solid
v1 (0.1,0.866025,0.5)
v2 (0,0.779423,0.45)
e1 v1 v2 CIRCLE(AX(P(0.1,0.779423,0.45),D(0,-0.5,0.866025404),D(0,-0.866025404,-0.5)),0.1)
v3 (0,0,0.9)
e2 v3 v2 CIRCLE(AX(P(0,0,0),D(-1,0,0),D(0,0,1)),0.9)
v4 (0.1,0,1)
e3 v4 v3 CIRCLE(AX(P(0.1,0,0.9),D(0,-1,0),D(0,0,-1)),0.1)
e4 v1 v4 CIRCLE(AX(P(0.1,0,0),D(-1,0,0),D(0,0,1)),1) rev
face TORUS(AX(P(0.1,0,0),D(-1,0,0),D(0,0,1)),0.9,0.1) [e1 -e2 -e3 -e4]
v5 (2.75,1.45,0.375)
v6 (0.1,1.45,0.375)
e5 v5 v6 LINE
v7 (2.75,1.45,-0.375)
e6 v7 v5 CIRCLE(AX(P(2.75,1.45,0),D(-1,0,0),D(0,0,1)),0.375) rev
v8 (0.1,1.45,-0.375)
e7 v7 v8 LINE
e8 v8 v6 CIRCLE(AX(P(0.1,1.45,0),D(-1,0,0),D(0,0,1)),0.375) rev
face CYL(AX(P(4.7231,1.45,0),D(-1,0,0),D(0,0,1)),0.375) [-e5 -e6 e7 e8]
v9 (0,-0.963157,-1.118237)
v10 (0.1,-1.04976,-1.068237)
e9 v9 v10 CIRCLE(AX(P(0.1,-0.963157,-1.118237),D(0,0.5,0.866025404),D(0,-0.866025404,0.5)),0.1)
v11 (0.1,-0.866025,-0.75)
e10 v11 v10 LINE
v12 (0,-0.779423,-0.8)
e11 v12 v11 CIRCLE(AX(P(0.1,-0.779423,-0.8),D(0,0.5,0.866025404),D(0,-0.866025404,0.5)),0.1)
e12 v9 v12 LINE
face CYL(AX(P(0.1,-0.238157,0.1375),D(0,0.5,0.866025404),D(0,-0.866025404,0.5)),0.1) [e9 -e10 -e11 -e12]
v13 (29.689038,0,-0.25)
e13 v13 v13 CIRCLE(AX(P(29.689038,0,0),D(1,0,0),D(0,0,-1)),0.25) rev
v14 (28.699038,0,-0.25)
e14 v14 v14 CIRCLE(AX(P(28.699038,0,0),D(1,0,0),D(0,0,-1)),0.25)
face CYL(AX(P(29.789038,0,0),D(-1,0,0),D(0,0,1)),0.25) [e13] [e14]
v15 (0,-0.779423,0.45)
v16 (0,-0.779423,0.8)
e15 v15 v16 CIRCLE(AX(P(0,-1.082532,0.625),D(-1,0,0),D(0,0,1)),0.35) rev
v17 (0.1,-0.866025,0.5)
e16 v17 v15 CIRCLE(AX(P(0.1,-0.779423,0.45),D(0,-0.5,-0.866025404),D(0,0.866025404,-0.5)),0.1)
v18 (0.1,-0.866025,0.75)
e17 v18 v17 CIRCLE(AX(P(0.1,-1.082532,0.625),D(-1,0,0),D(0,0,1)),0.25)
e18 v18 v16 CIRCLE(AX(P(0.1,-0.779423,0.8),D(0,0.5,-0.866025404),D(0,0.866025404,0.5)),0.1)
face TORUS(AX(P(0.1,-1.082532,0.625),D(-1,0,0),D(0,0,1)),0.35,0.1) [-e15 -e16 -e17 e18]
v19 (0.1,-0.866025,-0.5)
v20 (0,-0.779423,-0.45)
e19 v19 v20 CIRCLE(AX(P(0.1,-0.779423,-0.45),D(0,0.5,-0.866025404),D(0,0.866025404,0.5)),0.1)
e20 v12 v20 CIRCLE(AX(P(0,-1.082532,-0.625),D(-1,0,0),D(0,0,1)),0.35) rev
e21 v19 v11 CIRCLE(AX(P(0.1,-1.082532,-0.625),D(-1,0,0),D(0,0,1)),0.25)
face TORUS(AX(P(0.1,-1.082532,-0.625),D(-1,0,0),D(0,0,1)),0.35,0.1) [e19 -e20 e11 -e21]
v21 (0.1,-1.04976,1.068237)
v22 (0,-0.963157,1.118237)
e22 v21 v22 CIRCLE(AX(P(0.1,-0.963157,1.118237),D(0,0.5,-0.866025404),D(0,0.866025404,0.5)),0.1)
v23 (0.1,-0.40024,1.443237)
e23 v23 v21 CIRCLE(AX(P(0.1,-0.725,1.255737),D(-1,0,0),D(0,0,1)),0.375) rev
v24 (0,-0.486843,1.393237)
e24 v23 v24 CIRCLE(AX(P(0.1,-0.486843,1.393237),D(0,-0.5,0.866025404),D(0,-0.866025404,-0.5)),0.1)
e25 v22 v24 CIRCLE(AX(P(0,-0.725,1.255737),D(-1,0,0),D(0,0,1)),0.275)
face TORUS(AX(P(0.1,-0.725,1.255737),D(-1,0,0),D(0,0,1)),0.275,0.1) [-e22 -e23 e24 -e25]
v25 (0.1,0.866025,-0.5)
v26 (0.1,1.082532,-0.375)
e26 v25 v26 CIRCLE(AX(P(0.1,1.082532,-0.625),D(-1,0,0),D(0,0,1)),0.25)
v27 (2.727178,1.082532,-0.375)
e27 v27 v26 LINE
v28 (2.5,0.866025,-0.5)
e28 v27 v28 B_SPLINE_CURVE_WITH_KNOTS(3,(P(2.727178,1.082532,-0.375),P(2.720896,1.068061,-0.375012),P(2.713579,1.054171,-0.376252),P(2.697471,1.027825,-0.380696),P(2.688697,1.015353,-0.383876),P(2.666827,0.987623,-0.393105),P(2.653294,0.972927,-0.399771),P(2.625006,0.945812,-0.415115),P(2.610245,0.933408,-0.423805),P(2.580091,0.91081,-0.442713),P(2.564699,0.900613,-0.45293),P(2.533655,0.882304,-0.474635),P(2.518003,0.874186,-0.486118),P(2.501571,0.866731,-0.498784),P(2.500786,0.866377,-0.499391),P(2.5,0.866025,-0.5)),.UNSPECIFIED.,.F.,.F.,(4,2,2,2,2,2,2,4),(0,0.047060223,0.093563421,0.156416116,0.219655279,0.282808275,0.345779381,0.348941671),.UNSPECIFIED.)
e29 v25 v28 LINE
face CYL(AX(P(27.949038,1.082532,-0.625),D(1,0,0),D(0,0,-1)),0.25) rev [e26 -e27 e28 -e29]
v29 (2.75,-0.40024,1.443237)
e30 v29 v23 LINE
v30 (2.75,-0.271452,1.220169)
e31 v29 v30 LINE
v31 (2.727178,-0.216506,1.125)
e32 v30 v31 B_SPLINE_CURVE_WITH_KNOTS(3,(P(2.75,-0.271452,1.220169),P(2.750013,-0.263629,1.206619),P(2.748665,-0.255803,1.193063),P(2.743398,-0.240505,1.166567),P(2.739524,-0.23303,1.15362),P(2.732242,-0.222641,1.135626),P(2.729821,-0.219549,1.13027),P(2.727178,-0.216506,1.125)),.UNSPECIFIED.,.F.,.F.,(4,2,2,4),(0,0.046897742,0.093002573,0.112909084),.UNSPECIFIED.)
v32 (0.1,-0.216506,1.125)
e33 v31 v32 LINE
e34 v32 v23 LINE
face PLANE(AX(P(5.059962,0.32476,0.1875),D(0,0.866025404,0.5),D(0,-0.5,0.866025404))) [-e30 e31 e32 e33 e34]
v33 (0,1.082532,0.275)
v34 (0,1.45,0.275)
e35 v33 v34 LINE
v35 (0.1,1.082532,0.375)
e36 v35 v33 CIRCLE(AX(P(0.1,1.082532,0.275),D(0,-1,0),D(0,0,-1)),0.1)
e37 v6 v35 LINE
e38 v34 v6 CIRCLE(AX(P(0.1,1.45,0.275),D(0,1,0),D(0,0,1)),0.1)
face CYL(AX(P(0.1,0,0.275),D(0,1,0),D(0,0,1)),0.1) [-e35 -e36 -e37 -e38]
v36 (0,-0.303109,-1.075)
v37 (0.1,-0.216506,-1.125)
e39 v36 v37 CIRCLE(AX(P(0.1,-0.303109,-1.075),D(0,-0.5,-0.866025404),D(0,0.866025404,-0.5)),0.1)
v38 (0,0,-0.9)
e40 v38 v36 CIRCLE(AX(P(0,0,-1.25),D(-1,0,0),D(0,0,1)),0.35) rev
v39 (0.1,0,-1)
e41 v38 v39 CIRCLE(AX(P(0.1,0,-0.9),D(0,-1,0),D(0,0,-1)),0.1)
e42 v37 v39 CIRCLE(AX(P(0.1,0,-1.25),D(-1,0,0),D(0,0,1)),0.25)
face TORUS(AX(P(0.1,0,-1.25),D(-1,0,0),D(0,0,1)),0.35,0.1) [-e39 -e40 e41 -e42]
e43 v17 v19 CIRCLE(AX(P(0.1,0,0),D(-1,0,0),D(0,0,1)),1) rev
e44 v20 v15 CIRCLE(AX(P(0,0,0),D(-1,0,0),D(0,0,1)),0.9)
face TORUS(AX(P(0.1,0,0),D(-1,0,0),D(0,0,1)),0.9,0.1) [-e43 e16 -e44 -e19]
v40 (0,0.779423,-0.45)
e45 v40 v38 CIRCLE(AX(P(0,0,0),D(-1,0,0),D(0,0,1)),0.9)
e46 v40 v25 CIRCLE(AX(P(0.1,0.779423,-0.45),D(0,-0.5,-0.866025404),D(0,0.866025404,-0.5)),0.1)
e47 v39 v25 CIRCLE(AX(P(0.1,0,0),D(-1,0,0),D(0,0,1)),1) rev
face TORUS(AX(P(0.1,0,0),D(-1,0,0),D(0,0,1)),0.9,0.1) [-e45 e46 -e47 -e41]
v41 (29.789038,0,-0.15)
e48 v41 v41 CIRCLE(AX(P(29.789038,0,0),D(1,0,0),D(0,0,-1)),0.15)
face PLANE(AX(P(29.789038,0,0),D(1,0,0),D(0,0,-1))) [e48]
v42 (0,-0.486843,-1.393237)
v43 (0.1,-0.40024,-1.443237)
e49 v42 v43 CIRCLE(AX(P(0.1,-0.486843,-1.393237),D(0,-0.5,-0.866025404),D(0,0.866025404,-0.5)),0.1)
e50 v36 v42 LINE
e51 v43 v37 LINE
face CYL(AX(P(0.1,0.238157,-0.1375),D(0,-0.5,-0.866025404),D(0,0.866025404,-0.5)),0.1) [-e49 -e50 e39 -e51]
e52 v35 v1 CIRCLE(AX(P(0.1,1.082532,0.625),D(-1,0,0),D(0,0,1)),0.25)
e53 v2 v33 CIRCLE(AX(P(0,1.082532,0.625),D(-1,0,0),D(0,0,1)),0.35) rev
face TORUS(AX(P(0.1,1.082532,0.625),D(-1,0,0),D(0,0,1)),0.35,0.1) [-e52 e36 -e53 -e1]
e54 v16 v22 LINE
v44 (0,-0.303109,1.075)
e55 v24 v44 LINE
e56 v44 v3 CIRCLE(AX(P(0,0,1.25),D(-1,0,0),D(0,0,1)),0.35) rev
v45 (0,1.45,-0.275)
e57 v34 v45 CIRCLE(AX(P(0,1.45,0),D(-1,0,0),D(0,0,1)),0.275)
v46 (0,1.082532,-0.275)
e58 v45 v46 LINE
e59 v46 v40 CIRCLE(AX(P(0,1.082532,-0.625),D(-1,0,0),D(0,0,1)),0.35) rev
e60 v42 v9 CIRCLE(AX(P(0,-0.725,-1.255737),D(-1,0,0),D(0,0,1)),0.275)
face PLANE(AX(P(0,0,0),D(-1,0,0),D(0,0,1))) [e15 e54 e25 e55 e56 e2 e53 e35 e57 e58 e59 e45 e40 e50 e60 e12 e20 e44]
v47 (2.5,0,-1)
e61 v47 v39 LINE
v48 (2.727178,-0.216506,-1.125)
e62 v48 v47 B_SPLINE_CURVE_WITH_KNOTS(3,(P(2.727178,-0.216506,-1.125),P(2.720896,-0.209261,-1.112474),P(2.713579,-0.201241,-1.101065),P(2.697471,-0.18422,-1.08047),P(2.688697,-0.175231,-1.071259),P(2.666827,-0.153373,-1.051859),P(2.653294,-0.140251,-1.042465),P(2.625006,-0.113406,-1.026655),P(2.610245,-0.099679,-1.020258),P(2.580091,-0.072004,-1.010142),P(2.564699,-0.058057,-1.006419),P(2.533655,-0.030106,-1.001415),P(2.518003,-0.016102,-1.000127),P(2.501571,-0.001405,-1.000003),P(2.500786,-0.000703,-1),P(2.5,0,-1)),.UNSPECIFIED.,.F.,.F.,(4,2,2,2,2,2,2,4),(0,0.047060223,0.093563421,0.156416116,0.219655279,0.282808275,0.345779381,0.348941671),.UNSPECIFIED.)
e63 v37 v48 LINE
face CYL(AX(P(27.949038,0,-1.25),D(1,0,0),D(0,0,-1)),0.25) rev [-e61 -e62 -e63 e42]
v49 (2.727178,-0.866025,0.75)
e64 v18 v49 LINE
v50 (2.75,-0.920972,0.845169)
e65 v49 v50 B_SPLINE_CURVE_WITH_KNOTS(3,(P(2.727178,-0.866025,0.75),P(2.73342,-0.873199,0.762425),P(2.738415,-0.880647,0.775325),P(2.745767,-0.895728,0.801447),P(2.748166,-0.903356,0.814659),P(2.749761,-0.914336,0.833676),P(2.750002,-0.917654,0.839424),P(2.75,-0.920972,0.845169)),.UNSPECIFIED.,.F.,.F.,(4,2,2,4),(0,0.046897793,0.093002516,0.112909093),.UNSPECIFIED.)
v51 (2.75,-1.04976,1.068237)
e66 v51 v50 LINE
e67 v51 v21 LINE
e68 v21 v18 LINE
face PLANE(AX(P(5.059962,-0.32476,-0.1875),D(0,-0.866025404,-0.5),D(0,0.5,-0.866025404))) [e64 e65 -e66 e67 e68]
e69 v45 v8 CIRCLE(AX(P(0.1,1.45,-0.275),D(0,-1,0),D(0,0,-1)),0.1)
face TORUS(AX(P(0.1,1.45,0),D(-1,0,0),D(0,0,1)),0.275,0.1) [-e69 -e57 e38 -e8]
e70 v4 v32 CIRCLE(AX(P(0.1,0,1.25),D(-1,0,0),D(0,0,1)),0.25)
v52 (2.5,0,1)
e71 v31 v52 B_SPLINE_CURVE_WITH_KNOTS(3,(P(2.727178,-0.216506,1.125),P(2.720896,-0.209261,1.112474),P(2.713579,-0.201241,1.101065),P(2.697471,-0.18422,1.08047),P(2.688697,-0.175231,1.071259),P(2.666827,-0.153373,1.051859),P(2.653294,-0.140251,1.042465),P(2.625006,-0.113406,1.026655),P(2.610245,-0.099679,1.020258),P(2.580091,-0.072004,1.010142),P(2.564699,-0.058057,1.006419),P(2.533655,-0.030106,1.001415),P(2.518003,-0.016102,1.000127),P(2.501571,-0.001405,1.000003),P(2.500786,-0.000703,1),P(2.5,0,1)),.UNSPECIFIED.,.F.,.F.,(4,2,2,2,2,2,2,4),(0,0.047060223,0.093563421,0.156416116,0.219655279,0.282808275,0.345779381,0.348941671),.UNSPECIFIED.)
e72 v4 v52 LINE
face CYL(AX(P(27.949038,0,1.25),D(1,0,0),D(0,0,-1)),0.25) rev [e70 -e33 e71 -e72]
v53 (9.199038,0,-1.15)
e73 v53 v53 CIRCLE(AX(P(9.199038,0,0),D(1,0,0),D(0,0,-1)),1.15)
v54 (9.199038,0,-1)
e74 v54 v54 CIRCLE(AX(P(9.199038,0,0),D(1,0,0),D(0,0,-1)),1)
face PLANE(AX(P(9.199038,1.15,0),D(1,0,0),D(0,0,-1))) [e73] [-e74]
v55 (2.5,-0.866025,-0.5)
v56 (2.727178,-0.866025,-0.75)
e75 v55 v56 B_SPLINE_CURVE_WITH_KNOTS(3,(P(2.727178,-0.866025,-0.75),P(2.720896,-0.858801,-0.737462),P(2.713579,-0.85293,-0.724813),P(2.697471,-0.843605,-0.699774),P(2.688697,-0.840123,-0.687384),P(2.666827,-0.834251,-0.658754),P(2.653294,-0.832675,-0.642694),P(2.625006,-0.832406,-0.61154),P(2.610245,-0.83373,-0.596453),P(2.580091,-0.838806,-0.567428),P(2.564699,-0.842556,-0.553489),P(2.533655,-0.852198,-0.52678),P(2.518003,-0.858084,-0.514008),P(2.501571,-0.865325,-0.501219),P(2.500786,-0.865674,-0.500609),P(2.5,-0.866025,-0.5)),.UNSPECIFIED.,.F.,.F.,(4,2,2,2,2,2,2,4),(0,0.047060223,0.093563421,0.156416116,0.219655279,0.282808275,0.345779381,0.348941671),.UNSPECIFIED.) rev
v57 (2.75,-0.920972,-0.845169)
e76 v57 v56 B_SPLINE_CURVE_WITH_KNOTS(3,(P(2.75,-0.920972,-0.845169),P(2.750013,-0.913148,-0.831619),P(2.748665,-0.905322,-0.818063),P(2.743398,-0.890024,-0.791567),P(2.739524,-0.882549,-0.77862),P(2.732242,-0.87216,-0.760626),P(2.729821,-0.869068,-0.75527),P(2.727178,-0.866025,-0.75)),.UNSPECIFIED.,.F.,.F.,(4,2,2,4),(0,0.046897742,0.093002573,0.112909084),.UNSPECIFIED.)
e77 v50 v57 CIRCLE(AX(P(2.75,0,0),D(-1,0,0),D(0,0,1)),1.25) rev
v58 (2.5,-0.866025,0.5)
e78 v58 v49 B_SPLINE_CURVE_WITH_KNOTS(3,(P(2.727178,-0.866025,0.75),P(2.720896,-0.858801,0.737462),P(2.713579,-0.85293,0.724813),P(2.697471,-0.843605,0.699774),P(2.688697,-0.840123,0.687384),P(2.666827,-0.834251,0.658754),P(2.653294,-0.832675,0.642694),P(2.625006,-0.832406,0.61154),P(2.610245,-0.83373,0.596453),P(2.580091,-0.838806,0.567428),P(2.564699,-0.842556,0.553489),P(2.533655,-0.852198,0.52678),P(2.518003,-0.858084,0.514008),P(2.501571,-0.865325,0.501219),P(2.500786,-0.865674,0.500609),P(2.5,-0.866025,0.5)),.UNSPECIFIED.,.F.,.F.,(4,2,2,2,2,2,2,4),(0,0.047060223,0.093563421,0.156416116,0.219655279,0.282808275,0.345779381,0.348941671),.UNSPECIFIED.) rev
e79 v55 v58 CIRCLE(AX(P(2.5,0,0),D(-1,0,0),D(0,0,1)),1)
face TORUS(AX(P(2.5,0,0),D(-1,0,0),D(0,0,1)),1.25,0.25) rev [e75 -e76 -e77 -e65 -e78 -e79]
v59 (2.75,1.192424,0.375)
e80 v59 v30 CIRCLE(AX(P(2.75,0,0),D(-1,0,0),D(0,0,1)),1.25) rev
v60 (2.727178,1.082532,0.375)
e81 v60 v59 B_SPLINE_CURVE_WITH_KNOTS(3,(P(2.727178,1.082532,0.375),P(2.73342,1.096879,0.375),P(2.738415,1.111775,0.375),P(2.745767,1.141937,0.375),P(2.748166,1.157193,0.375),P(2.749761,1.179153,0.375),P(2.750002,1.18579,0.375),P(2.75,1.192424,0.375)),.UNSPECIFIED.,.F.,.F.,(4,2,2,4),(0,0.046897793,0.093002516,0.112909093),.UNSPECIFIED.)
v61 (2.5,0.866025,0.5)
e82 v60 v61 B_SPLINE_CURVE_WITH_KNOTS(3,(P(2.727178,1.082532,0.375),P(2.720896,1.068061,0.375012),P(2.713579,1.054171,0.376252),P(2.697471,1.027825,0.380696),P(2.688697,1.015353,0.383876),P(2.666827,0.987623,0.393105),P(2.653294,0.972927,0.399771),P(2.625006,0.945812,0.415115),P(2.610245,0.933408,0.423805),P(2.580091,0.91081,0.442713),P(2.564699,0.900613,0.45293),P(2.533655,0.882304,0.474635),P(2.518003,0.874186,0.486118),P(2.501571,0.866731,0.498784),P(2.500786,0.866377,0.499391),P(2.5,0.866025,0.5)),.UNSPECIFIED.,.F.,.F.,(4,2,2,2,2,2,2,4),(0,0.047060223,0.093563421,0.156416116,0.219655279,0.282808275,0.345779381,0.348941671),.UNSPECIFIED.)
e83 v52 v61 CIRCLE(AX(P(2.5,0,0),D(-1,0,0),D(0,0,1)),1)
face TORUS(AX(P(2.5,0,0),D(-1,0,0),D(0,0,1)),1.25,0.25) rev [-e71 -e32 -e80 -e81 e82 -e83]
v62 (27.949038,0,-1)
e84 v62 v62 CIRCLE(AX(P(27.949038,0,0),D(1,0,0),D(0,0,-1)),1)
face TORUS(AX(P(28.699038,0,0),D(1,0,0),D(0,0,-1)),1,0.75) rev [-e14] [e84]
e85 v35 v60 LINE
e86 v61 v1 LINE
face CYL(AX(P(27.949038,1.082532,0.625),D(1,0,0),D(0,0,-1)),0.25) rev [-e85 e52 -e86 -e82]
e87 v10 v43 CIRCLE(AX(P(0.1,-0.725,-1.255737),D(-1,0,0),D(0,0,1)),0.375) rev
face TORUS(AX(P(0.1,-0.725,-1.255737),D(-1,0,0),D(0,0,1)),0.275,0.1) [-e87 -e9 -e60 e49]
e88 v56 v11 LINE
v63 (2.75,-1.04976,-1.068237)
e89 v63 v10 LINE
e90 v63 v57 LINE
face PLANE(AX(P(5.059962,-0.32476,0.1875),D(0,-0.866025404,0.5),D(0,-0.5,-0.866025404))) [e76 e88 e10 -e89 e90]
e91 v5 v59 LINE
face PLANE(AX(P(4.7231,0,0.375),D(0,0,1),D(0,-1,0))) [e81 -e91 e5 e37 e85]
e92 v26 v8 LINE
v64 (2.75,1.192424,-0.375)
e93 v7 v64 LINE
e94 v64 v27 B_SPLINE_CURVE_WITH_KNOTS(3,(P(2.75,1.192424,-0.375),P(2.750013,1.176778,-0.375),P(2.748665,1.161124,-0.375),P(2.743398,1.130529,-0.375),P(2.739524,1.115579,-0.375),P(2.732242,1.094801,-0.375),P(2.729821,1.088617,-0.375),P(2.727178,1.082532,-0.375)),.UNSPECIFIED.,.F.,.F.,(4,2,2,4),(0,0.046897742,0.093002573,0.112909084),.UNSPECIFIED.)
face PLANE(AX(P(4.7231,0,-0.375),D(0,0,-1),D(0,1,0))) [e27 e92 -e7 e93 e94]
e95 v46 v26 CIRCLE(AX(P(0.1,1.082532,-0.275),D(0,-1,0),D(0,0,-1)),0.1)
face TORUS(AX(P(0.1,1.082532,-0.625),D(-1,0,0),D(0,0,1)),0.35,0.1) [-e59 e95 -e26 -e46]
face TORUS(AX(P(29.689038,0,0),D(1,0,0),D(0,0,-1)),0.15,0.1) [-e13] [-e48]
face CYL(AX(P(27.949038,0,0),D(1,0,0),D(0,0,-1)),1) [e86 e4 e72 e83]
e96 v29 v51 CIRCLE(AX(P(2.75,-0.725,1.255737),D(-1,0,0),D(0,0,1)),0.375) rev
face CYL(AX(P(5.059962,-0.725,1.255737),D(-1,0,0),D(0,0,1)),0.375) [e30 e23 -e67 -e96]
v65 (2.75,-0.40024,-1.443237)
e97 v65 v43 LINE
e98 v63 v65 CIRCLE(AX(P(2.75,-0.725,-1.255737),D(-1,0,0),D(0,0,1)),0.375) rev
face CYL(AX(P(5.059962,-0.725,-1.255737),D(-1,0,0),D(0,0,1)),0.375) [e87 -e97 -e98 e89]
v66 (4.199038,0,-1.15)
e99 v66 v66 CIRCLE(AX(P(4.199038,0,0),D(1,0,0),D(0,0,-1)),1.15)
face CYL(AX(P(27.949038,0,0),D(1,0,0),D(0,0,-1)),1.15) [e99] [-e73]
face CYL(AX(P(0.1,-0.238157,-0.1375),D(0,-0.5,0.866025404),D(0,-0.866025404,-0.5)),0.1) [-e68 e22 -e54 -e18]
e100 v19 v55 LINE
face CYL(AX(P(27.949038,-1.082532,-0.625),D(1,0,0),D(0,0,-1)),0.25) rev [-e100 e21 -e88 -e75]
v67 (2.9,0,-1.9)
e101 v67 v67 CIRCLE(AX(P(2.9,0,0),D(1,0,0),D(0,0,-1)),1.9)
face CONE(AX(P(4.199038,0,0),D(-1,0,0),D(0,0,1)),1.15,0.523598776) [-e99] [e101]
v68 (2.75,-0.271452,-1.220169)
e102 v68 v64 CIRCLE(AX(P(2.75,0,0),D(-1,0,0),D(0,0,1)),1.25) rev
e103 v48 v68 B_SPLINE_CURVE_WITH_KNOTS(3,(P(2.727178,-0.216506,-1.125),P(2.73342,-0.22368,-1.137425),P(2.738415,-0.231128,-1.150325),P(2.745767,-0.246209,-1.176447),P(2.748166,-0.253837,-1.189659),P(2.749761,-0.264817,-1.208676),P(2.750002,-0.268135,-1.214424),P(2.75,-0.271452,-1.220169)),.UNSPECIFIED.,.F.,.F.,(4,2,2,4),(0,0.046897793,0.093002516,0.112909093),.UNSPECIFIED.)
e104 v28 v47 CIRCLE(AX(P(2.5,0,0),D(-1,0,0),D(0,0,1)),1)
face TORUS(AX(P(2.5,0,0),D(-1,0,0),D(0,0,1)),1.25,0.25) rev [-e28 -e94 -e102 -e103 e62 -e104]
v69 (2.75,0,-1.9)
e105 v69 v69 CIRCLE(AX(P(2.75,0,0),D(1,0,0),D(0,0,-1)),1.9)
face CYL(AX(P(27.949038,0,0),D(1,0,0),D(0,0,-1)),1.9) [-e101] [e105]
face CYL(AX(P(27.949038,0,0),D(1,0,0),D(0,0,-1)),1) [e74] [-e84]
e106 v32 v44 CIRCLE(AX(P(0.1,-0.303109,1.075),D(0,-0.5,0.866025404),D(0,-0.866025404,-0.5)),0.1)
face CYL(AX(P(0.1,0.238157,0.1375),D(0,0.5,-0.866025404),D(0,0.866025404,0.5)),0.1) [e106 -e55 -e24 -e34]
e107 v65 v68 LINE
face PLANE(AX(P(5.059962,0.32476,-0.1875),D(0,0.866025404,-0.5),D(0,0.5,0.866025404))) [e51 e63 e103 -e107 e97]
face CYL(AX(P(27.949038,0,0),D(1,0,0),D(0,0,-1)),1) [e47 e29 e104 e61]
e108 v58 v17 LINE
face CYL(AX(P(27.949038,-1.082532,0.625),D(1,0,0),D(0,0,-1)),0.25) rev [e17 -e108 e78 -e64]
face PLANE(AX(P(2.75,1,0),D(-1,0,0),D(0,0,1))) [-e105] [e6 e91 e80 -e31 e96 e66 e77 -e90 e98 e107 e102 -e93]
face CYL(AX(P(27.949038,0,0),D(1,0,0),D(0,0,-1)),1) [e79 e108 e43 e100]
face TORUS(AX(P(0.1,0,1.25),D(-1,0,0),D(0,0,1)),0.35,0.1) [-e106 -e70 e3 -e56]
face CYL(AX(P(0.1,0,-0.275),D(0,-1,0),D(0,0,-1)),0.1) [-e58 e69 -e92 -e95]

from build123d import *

# Parameters (mm, degrees)
BOSS_EXTRUDE1_DEPTH = 2.75
CIRPATTERN1_COUNT   = 3
FILLET1_R           = 0.25
SKETCH3_R           = 0.25
BOSS_EXTRUDE2_DEPTH = 1.84
FILLET2_R           = 0.75
FILLET3_R           = 0.1


with BuildPart() as part:
    # Sketch1 → Revolve1 (revolve)
    with BuildSketch(Plane.XY, mode=Mode.PRIVATE) as revolve1_sk:
        Polygon((0, 0), (0, 1), (2.75, 1), (2.75, 1.9), (2.9, 1.9), (4.199038106, 1.15), (9.199038106, 1.15), (9.199038106, 1), (27.949038106, 1), (27.949038106, 0), align=None)
    revolve(revolve1_sk.sketch.rotate(Axis((27.949038106, 0, 0), (-1, 0, 0)), 90), axis=Axis((27.949038106, 0, 0), (-1, 0, 0)))

    # Sketch2 → Boss-Extrude1 (add)
    with BuildSketch(Plane.ZY):
        with BuildLine():
            Line((-0.375, 0), (0.375, 0))
            Line((0.375, 0), (0.375, 1.45))
            ThreePointArc((0.375, 1.45), (0, 1.825), (-0.375, 1.45))
            Line((-0.375, 1.45), (-0.375, 0))
        make_face()
    boss_extrude1 = extrude(amount=-BOSS_EXTRUDE1_DEPTH)

    # CirPattern1: Boss-Extrude1 ×3 about axis
    cirpattern1_axis = Axis((0, 0, 0), (1, 0, 0))
    for i in range(1, CIRPATTERN1_COUNT):
        add(boss_extrude1.rotate(cirpattern1_axis, i * 360 / CIRPATTERN1_COUNT))

    # Fillet1
    fillet1_edges = [part.edges().sort_by_distance(p)[0] for p in [
        (2.75, 0.5, 0.866025404),
        (1.375, 0.927024811, -0.375),
        (1.375, 0.927024811, 0.375),
        (2.75, -1, 0),
        (2.75, 0.5, -0.866025404),
        (1.375, -0.138752879, 0.990327036),
        (1.375, -0.788271932, 0.615327036),
        (1.375, -0.788271932, -0.615327036),
        (1.375, -0.138752879, -0.990327036),
    ]]
    fillet(fillet1_edges, radius=FILLET1_R)

    # Sketch3 → Boss-Extrude2 (add)
    with BuildSketch(Plane(origin=(27.949038106, 0, 0), x_dir=(0, 0, -1), z_dir=(1, 0, 0))):
        Circle(SKETCH3_R)
    extrude(amount=BOSS_EXTRUDE2_DEPTH)

    # Fillet2
    fillet2_edges = [part.edges().sort_by_distance(p)[0] for p in [
        (27.949038106, 0, 0.25),
    ]]
    fillet(fillet2_edges, radius=FILLET2_R - 0.0001)  # a hair under: the kernel refuses the full size

    # Fillet3
    fillet3_edges = [part.edges().sort_by_distance(p)[0] for p in [
        (29.789038106, 0, 0.25),
        (0, 1.825, 0),
        (0, 1.266265877, -0.375),
        (0, -0.9125, -1.580496362),
        (0, -0.957892465, -0.909118418),
        (0, -0.9125, 1.580496362),
        (0, -0.308373412, 1.284118418),
        (0, 0.4999999999999994, -0.866025403784439),
        (0, -0.308373412, -1.284118418),
        (0, -0.957892465, 0.909118418),
        (0, -1, 0),
        (0, 0.5000000000000002, 0.8660254037844385),
        (0, 1.266265877, 0.375),
        (0, 0.957531755, -0.408493649),
        (0, -0.125, -1.033493649),
        (0, -0.832531755, 0.625),
        (0, -0.832531755, -0.625),
        (0, -0.125, 1.033493649),
        (0, 0.957531755, 0.408493649),
    ]]
    fillet(fillet3_edges, radius=FILLET3_R)


solid = part.part
